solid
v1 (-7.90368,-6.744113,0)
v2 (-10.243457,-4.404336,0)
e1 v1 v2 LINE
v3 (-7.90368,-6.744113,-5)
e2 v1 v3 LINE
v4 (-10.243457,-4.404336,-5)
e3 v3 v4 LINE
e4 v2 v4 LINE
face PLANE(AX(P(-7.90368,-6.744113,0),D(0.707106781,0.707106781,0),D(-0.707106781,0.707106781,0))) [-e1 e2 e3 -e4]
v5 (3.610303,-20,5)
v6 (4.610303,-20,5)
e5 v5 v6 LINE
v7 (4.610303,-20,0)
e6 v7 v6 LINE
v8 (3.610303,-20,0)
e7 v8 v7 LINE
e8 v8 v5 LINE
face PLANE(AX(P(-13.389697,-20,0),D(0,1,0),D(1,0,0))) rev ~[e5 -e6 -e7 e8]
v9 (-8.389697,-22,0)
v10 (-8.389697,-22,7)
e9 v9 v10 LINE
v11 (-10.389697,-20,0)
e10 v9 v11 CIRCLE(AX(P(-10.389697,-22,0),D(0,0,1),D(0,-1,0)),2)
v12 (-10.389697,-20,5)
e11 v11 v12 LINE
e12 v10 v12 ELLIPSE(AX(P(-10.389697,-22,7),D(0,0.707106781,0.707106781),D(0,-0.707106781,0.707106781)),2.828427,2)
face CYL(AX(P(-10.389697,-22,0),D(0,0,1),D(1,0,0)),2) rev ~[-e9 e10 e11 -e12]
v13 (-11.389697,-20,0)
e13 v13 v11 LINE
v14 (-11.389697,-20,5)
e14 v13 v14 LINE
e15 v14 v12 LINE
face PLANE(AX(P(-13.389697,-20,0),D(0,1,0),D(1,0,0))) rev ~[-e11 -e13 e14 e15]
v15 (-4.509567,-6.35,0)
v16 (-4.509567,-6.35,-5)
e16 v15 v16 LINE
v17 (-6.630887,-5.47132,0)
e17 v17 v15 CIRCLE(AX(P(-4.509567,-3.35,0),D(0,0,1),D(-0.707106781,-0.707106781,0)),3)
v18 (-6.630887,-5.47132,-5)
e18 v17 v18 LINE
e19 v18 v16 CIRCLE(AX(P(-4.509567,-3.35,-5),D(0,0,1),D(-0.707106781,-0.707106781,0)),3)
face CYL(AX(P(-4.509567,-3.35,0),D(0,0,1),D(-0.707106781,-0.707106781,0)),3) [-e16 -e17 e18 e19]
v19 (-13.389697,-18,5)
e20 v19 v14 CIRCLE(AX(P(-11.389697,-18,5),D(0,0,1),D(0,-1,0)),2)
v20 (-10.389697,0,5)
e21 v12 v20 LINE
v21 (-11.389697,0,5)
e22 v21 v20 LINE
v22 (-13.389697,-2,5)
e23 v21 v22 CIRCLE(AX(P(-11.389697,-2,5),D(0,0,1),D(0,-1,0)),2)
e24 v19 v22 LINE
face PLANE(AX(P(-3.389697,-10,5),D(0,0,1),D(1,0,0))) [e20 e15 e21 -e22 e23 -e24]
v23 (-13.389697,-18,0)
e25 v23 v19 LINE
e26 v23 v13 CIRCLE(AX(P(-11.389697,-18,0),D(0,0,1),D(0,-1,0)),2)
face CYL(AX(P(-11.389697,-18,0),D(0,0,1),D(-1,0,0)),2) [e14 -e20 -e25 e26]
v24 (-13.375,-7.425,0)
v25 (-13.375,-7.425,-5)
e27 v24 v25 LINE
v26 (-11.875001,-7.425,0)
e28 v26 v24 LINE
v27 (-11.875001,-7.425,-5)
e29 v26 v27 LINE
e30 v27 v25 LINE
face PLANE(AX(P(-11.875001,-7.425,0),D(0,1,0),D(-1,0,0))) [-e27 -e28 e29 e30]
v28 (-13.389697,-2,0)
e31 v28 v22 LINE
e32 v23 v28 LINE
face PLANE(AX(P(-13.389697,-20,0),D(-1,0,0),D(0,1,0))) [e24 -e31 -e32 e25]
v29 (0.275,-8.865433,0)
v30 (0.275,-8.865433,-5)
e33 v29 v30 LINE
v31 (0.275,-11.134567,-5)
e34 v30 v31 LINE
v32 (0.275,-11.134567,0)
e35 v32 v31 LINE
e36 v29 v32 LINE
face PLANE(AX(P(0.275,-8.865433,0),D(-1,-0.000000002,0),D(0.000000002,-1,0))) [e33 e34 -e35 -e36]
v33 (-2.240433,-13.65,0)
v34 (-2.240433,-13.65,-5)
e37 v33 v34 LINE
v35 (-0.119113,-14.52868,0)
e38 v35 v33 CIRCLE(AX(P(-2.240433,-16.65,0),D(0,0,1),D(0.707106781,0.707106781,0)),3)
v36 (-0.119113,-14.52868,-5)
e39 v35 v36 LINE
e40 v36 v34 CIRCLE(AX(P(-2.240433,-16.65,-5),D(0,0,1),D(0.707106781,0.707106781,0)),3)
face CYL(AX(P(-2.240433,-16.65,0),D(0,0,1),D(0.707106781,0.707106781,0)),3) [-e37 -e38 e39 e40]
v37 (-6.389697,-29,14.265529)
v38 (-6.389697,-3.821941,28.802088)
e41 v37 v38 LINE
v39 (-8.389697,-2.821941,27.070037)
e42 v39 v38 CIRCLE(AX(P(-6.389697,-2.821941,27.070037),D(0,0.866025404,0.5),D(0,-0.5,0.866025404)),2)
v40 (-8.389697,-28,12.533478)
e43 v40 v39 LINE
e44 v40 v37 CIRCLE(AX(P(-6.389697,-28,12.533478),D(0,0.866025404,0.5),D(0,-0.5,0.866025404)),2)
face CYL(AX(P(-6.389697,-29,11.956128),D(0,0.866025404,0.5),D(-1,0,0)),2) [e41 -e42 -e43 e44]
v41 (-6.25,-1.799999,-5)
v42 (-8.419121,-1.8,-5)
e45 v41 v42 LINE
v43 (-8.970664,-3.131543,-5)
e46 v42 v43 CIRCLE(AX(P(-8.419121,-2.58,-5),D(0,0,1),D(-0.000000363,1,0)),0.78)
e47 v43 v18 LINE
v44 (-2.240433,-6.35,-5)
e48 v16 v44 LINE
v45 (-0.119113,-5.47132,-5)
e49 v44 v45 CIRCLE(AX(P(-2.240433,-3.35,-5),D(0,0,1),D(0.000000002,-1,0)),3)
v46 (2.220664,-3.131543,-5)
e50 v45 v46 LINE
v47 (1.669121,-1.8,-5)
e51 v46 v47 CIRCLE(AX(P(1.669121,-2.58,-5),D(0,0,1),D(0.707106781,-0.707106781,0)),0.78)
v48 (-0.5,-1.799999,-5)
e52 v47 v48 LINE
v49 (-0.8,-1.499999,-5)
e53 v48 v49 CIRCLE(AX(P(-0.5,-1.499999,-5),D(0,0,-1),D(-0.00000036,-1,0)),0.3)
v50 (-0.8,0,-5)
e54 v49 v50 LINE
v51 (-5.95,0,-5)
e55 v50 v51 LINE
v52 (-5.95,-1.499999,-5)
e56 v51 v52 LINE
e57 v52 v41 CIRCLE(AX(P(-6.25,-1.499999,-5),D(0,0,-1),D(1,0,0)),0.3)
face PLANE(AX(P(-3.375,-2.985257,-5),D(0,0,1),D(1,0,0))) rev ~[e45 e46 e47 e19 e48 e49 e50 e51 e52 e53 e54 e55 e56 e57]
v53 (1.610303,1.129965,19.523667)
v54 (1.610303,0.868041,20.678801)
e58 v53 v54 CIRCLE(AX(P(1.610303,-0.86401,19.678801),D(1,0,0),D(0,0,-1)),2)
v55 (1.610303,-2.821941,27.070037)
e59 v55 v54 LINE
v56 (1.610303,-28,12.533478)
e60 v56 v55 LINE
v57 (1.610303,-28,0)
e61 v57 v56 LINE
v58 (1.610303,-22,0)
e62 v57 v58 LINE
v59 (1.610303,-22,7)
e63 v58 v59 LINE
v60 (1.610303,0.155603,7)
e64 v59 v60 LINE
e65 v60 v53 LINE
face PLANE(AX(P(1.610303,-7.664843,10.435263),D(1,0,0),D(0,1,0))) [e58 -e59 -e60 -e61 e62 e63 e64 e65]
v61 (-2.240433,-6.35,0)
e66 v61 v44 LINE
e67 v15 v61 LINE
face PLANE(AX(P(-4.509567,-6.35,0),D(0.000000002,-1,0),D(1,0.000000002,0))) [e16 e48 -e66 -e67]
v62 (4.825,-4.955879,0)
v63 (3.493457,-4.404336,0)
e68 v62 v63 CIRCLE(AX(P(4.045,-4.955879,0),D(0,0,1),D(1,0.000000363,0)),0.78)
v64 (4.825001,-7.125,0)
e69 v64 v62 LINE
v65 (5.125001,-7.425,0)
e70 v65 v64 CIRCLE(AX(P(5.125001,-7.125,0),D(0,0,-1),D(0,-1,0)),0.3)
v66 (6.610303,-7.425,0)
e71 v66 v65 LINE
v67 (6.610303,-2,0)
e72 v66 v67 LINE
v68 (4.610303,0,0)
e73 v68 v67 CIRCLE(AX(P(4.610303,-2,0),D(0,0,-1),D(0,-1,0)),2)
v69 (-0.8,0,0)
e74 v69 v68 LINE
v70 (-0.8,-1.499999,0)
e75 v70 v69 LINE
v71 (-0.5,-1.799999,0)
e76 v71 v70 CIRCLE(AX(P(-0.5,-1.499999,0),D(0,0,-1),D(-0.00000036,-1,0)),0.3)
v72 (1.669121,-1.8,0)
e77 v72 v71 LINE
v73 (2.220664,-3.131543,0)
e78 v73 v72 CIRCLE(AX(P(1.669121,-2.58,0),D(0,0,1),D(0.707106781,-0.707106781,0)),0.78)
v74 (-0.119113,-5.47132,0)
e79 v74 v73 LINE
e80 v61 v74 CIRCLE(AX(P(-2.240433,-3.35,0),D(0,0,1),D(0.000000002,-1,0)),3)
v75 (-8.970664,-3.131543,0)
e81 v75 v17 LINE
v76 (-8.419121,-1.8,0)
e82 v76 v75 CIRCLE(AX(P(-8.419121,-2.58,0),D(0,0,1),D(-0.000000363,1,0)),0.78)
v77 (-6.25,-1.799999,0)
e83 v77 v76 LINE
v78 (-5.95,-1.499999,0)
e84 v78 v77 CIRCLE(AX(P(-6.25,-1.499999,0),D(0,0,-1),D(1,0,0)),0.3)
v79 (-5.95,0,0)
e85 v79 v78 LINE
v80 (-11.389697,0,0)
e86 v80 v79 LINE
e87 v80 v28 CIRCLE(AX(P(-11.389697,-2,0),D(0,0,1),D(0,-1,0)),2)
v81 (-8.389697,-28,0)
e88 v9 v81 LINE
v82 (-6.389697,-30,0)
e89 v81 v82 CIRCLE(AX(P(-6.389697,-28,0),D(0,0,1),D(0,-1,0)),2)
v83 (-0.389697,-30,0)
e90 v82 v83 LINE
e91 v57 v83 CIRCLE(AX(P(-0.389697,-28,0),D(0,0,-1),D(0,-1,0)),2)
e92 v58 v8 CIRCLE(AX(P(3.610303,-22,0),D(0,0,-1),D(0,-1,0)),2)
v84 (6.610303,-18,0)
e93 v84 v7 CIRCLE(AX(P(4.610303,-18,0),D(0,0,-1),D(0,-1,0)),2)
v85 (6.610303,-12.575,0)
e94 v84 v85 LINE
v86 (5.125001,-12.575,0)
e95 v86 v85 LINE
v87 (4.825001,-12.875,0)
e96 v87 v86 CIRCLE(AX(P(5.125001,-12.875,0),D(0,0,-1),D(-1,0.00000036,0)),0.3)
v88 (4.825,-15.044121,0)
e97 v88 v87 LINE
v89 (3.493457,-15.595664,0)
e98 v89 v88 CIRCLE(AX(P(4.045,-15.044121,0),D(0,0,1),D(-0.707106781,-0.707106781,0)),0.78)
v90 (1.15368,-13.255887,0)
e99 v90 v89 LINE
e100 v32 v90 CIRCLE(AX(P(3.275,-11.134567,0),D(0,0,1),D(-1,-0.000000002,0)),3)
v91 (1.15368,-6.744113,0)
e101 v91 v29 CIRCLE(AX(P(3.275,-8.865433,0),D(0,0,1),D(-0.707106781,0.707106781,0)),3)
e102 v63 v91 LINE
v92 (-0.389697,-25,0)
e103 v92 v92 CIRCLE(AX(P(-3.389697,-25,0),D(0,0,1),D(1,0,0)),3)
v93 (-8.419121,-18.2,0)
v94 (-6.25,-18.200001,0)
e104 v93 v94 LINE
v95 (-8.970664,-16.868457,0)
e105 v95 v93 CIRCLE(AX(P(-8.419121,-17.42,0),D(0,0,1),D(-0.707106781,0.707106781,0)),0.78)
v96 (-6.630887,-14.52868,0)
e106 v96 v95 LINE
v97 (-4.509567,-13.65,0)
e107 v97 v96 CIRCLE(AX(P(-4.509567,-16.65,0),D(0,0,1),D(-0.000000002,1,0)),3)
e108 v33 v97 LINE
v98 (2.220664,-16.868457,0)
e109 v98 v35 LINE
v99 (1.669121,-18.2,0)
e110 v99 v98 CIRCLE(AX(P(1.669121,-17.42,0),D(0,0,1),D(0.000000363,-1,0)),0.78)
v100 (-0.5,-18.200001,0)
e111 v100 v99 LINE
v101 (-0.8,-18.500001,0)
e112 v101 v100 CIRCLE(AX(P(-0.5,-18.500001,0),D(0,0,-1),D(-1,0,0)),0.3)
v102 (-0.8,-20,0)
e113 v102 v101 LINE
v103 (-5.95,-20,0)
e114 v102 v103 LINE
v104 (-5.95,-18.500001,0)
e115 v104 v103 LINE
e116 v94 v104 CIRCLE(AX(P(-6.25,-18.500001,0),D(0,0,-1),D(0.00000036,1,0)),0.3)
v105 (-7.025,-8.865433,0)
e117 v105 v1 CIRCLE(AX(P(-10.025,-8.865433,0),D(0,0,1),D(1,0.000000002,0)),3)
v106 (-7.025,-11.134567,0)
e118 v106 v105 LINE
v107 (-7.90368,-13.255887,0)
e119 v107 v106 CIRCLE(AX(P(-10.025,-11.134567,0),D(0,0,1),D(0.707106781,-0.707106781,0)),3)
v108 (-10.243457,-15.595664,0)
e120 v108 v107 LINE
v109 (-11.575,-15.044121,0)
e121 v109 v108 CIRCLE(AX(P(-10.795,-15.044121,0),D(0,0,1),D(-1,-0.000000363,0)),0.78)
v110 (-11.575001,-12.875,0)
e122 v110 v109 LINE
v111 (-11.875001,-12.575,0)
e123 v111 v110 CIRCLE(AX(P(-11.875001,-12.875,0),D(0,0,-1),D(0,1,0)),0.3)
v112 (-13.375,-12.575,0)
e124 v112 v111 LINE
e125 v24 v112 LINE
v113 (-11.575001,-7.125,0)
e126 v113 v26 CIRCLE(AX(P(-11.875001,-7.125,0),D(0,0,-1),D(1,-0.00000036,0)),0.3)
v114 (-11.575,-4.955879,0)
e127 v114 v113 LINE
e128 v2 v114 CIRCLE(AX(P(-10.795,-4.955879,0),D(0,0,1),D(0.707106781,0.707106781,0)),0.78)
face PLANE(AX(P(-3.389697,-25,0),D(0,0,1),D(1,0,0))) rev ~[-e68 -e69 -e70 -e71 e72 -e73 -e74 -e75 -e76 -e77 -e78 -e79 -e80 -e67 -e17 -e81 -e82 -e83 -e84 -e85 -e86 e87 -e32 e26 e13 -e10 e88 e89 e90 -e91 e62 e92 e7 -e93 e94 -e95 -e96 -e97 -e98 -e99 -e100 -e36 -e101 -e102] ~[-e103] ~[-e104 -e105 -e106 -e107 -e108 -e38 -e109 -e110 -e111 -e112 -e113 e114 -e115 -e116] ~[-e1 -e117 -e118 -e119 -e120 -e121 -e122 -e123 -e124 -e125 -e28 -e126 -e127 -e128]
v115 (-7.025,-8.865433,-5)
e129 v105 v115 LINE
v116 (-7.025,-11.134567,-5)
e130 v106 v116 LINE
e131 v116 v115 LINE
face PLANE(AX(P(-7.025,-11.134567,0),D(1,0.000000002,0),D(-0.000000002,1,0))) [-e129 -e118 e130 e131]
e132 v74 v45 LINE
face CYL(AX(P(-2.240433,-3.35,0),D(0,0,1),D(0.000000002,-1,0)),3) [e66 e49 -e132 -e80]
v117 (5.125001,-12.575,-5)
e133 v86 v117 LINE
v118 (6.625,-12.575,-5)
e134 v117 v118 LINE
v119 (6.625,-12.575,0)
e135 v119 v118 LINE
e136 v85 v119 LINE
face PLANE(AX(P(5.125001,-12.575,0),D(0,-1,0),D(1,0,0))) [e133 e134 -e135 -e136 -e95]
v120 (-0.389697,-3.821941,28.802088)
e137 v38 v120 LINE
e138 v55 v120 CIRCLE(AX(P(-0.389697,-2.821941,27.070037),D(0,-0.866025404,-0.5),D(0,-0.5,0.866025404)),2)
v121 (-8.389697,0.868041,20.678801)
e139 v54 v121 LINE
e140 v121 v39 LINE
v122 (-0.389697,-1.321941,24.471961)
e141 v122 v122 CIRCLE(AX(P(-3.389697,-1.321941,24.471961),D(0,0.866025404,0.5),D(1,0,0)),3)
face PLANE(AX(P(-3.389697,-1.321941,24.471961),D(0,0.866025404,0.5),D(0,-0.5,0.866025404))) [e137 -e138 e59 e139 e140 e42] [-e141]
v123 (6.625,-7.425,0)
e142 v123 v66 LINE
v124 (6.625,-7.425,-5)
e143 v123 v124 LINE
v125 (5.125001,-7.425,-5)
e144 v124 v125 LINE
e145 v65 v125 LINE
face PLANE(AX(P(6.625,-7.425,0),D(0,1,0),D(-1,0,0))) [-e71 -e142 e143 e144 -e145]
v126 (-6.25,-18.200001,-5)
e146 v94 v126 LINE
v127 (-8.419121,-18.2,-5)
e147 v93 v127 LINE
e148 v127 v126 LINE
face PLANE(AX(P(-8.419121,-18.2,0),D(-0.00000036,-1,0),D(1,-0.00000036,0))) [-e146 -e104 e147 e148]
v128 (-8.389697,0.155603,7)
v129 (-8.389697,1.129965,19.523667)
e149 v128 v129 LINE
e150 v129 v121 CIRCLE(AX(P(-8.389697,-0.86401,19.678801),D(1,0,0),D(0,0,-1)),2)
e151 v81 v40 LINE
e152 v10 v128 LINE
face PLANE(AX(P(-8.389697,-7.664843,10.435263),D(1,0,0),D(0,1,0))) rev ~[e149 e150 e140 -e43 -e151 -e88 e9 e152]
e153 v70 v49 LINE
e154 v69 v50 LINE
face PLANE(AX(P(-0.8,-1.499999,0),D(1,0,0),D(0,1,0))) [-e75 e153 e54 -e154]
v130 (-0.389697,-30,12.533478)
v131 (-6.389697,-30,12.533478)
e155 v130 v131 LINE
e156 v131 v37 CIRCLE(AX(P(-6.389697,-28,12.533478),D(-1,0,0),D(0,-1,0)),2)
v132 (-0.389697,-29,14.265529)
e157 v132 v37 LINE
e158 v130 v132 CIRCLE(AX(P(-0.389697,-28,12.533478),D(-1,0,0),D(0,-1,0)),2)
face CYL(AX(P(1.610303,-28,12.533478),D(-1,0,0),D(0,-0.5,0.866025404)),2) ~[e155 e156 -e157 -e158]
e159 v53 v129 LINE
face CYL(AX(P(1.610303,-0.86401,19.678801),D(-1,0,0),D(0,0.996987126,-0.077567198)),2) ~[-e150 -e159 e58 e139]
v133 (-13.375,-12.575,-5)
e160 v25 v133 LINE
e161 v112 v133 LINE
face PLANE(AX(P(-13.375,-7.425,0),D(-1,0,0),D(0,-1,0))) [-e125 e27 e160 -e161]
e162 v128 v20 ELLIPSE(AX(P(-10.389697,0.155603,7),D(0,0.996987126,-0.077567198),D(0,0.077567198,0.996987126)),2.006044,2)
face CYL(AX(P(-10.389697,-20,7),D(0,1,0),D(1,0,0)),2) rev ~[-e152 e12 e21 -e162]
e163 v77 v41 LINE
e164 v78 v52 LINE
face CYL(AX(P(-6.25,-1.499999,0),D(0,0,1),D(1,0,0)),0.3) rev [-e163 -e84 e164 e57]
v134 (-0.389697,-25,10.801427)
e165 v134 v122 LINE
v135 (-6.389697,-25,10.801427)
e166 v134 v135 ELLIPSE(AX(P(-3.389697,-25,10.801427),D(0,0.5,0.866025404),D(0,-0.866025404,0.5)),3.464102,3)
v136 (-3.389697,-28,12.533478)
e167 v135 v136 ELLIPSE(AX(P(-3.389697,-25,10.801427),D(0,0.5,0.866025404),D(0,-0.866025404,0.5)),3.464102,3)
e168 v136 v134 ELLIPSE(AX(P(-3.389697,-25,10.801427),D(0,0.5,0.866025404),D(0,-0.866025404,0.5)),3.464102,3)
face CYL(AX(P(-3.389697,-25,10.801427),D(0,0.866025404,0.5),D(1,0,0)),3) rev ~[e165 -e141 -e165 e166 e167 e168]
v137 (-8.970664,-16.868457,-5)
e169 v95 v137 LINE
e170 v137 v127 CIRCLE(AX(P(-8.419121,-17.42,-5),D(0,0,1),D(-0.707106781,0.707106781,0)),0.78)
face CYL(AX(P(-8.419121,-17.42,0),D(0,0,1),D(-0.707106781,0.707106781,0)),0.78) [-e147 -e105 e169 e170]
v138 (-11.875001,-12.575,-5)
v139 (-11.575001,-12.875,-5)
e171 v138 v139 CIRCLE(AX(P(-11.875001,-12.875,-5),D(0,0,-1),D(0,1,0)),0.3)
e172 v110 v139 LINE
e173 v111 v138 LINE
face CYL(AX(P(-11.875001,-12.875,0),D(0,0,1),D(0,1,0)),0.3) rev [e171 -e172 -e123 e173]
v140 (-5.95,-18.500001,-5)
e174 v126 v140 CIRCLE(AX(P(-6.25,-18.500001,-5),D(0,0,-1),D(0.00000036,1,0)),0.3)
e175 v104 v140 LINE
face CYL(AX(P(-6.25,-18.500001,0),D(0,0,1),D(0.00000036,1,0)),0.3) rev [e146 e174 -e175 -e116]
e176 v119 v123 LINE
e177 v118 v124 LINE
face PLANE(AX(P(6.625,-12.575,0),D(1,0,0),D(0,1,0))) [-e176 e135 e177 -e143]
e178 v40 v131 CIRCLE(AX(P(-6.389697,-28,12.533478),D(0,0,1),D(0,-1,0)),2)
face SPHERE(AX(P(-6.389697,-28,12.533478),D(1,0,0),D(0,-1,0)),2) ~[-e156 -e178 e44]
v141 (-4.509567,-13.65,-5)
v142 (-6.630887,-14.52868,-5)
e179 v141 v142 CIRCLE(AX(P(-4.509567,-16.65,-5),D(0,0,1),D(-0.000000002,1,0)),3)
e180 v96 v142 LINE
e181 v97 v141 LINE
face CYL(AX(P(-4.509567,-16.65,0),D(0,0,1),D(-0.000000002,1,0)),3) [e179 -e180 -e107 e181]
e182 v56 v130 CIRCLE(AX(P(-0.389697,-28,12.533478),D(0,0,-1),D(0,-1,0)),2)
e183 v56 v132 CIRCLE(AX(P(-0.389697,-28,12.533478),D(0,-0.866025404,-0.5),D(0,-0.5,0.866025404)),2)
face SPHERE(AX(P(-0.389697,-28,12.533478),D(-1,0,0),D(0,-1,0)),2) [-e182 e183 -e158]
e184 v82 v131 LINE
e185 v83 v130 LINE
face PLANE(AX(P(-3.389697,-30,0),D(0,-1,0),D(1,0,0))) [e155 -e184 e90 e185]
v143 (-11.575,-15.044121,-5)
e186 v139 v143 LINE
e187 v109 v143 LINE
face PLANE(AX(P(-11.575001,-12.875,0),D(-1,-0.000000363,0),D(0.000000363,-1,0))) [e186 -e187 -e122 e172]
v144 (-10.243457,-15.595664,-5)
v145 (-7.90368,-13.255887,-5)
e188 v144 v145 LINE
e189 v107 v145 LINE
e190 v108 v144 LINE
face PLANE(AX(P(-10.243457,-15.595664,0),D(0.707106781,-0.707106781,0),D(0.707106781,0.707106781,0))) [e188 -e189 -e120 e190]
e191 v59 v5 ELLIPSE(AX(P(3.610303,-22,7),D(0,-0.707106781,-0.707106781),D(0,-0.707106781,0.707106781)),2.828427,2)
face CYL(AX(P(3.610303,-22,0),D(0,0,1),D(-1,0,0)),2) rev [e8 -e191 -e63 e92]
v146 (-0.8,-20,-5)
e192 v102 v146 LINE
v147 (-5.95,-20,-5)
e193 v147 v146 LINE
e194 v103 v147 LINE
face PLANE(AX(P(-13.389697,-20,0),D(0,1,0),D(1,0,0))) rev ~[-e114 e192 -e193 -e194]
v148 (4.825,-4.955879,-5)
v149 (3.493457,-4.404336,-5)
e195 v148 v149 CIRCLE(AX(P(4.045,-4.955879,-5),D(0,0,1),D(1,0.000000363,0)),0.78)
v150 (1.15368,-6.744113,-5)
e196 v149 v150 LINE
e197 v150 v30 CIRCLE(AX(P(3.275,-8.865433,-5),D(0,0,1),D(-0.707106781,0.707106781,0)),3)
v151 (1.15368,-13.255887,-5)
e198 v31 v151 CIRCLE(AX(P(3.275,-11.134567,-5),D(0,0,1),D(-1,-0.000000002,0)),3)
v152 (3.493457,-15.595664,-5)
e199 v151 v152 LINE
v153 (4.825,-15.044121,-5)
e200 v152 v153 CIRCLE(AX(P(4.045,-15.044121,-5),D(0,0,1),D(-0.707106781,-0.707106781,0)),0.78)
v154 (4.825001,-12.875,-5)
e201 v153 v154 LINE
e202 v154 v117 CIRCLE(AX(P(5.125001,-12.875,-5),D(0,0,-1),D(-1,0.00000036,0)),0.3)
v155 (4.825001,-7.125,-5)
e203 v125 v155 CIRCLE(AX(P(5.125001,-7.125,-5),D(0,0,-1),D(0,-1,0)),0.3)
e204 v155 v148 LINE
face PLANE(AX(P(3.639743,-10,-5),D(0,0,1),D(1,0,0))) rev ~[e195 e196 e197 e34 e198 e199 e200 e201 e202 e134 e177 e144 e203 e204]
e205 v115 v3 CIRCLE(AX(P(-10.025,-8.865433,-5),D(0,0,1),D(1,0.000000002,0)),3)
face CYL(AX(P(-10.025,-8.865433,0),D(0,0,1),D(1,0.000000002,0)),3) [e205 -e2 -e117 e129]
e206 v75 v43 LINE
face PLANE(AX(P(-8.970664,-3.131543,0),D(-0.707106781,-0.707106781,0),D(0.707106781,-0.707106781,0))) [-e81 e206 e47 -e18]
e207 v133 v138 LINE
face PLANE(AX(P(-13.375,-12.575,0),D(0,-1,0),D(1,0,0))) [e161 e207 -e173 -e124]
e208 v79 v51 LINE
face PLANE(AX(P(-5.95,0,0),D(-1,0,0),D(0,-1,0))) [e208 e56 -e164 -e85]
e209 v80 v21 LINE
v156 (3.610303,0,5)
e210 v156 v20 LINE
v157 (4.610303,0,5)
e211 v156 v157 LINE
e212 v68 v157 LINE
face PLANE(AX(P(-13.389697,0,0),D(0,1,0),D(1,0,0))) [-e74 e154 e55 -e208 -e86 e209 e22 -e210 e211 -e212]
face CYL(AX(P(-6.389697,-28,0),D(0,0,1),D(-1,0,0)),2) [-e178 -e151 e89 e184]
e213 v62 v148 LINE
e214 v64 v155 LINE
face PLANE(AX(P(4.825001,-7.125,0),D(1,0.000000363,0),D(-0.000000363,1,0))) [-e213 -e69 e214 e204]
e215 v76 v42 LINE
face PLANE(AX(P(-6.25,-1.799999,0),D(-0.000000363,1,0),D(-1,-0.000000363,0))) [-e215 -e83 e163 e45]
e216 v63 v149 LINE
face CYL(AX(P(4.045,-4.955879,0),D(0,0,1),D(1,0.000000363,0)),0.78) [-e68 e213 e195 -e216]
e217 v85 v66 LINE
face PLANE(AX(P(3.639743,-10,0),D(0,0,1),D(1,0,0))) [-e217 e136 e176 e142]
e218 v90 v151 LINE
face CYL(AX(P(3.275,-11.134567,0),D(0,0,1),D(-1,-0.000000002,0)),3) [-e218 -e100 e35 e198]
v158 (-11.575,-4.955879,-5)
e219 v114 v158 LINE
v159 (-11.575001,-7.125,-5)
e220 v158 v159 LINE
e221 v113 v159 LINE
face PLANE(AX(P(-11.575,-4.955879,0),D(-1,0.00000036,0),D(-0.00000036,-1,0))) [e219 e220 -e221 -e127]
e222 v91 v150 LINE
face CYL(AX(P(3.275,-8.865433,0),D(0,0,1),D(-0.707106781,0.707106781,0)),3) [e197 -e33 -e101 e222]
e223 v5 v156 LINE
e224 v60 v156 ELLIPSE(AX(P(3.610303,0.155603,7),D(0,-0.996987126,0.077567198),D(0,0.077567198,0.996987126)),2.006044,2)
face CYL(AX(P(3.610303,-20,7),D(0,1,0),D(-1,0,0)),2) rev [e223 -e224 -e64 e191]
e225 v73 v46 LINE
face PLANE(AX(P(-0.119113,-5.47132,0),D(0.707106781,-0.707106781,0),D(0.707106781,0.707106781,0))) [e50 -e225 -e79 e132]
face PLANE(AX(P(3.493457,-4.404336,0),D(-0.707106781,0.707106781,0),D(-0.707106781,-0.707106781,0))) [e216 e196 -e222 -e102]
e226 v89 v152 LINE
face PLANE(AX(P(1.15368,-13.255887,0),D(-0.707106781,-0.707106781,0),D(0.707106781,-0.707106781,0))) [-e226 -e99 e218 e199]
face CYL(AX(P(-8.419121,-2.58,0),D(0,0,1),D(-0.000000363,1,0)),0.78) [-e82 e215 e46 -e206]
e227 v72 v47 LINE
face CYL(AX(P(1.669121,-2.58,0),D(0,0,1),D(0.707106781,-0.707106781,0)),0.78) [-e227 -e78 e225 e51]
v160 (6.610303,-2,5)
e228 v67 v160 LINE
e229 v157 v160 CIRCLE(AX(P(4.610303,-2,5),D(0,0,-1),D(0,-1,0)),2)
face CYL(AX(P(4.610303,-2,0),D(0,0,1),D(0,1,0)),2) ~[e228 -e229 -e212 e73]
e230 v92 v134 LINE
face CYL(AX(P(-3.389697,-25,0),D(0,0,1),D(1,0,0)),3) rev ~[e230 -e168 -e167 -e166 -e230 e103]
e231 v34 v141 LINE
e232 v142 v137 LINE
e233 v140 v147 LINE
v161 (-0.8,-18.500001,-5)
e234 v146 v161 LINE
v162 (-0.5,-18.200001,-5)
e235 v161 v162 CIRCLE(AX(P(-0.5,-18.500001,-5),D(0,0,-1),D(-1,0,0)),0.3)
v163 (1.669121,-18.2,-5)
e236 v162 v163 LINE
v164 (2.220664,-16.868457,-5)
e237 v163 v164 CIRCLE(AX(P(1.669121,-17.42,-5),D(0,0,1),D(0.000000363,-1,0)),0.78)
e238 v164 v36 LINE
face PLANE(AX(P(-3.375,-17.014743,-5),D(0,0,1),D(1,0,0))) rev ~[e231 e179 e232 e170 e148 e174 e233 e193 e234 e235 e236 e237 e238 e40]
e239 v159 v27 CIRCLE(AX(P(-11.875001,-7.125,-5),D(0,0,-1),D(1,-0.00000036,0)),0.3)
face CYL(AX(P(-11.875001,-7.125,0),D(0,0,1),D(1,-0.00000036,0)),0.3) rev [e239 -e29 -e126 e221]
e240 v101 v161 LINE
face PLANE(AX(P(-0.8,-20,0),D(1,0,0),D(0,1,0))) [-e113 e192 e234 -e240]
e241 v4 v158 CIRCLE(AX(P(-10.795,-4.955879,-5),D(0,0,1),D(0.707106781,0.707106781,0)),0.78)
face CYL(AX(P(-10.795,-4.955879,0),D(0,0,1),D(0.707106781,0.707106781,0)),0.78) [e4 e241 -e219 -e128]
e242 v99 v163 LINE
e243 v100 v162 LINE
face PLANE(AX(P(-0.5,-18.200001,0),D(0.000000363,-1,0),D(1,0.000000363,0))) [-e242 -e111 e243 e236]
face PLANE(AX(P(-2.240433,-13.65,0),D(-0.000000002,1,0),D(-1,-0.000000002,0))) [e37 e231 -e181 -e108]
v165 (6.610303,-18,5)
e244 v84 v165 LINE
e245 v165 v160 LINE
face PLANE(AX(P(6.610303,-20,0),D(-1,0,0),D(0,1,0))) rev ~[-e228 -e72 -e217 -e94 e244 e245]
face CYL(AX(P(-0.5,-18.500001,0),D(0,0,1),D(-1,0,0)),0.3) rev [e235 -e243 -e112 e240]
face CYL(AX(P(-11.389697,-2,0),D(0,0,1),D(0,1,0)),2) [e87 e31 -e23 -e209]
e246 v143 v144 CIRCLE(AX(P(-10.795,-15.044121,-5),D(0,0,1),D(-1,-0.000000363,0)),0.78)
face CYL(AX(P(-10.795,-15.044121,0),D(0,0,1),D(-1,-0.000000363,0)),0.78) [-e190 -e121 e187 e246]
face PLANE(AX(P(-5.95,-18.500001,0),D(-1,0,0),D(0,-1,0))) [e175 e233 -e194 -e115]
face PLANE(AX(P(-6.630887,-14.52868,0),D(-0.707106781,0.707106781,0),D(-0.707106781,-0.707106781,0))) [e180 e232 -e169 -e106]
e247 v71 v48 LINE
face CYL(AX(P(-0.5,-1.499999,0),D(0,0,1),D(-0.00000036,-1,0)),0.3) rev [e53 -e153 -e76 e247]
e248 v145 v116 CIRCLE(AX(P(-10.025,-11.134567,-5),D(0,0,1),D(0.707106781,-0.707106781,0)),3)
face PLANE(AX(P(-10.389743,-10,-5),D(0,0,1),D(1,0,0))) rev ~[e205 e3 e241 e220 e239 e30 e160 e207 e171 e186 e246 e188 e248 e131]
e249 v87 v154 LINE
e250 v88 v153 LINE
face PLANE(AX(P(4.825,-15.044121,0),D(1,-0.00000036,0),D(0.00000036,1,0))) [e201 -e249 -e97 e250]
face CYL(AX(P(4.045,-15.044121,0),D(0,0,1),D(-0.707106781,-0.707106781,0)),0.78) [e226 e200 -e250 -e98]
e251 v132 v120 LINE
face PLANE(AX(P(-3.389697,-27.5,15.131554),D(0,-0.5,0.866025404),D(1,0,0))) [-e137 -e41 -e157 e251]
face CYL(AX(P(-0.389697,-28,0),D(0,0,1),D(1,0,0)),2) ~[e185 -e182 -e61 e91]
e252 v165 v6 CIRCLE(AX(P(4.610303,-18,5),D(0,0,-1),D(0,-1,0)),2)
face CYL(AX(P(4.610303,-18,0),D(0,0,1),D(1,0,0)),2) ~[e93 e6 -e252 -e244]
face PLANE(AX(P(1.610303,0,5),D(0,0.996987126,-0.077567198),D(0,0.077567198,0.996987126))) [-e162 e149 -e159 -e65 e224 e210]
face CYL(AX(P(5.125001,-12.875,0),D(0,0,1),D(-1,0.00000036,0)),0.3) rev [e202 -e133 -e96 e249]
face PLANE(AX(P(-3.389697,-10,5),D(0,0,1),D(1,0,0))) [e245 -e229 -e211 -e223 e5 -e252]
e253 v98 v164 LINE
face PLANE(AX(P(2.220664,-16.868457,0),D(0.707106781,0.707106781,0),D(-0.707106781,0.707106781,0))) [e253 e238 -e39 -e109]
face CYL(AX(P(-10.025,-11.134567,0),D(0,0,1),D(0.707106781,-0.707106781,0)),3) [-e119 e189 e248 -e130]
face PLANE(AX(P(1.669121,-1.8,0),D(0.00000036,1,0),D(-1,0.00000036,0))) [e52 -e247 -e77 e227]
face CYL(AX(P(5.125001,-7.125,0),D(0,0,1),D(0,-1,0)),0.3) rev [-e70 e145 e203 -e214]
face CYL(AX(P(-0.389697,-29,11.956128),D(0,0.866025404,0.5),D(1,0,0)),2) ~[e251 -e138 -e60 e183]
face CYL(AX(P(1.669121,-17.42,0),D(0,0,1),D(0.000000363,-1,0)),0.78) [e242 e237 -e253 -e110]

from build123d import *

# Parameters (mm, degrees)
F1_DEPTH = 5
F2_W     = 20
F2_H     = 20
F3_DEPTH = 5
F6_W     = 10
F6_H     = 10
F6_R     = 3
F9_DEPTH = 10
F10_R    = 2


with BuildPart() as f1:
    # F0 (on Top) → F1 (new body)
    with BuildSketch(Plane.XY):
        with BuildLine():
            Line((-11.8750007629, -7.425), (-12.575, -7.425))
            Line((-12.575, -7.425), (-13.375, -7.425))
            Line((-13.375, -7.425), (-13.375, -12.575))
            Line((-13.375, -12.575), (-12.575, -12.575))
            Line((-12.575, -12.575), (-11.8750007629, -12.575))
            ThreePointArc((-11.8750007629, -12.575), (-11.6628687671, -12.6628679271), (-11.5750007629, -12.8749998911))
            Line((-11.5750007629, -12.8749998911), (-11.5749999754, -15.0441214738))
            ThreePointArc((-11.5749999754, -15.0441214738), (-11.0934929218, -15.7647472802), (-10.2434566861, -15.5956644799))
            Line((-10.2434566861, -15.5956644799), (-7.9036796566, -13.2558874505))
            ThreePointArc((-7.9036796566, -13.2558874505), (-7.2533614014, -12.2826174011), (-7.0250000001, -11.1345671007))
            Line((-7.0250000001, -11.1345671007), (-7.0250000049, -8.8654328821))
            ThreePointArc((-7.0250000049, -8.8654328821), (-7.2533614085, -7.7173825884), (-7.9036796613, -6.7441125448))
            Line((-7.9036796613, -6.7441125448), (-10.2434566921, -4.404335514))
            ThreePointArc((-10.2434566921, -4.404335514), (-11.0934929289, -4.2352527142), (-11.5749999814, -4.9558785223))
            Line((-11.5749999814, -4.9558785223), (-11.5750007629, -7.1250001081))
            ThreePointArc((-11.5750007629, -7.1250001081), (-11.6628687668, -7.3371320726), (-11.8750007629, -7.425))
        make_face()
    extrude(amount=-F1_DEPTH)



with BuildPart() as f1b:
    # F0 (on Top) → F1, piece 2 (new body)
    with BuildSketch(Plane.XY):
        with BuildLine():
            Line((-0.8, -20), (-0.8, -19.2))
            Line((-0.8, -19.2), (-0.8, -18.5000007629))
            ThreePointArc((-0.8, -18.5000007629), (-0.7121320729, -18.2878687671), (-0.5000001089, -18.2000007629))
            Line((-0.5000001089, -18.2000007629), (1.6691214738, -18.1999999754))
            ThreePointArc((1.6691214738, -18.1999999754), (2.3897472802, -17.7184929218), (2.2206644799, -16.868456686))
            Line((2.2206644799, -16.868456686), (-0.1191125495, -14.5286796566))
            ThreePointArc((-0.1191125495, -14.5286796566), (-1.0923825989, -13.8783614014), (-2.2404328993, -13.6500000001))
            Line((-2.2404328993, -13.6500000001), (-4.5095671179, -13.6500000049))
            ThreePointArc((-4.5095671179, -13.6500000049), (-5.6576174116, -13.8783614085), (-6.6308874552, -14.5286796613))
            Line((-6.6308874552, -14.5286796613), (-8.970664486, -16.8684566921))
            ThreePointArc((-8.970664486, -16.8684566921), (-9.1397472858, -17.7184929288), (-8.4191214777, -18.1999999814))
            Line((-8.4191214777, -18.1999999814), (-6.2499998919, -18.2000007629))
            ThreePointArc((-6.2499998919, -18.2000007629), (-6.0378679274, -18.2878687668), (-5.95, -18.5000007629))
            Line((-5.95, -18.5000007629), (-5.95, -19.2))
            Line((-5.95, -19.2), (-5.95, -20))
            Line((-5.95, -20), (-0.8, -20))
        make_face()
    extrude(amount=-F1_DEPTH)


with BuildPart() as f1c:
    # F0 (on Top) → F1, piece 3 (new body)
    with BuildSketch(Plane.XY):
        with BuildLine():
            Line((3.4934566861, -4.4043355201), (1.1536796566, -6.7441125495))
            ThreePointArc((1.1536796566, -6.7441125495), (0.5033614014, -7.7173825989), (0.2750000001, -8.8654328993))
            Line((0.2750000001, -8.8654328993), (0.2750000049, -11.1345671179))
            ThreePointArc((0.2750000049, -11.1345671179), (0.5033614085, -12.2826174116), (1.1536796613, -13.2558874552))
            Line((1.1536796613, -13.2558874552), (3.4934566921, -15.595664486))
            ThreePointArc((3.4934566921, -15.595664486), (4.3434929289, -15.7647472858), (4.8249999814, -15.0441214777))
            Line((4.8249999814, -15.0441214777), (4.8250007629, -12.8749998919))
            ThreePointArc((4.8250007629, -12.8749998919), (4.9128687668, -12.6628679274), (5.1250007629, -12.575))
            Line((5.1250007629, -12.575), (5.825, -12.575))
            Line((5.825, -12.575), (6.625, -12.575))
            Line((6.625, -12.575), (6.625, -7.425))
            Line((6.625, -7.425), (5.825, -7.425))
            Line((5.825, -7.425), (5.1250007629, -7.425))
            ThreePointArc((5.1250007629, -7.425), (4.9128687671, -7.3371320729), (4.8250007629, -7.1250001089))
            Line((4.8250007629, -7.1250001089), (4.8249999754, -4.9558785262))
            ThreePointArc((4.8249999754, -4.9558785262), (4.3434929218, -4.2352527198), (3.4934566861, -4.4043355201))
        make_face()
    extrude(amount=-F1_DEPTH)


with BuildPart() as f1d:
    # F0 (on Top) → F1, piece 4 (new body)
    with BuildSketch(Plane.XY):
        with BuildLine():
            Line((-0.8, -1.4999992371), (-0.8, -0.8))
            Line((-0.8, -0.8), (-0.8, 0))
            Line((-0.8, 0), (-5.95, 0))
            Line((-5.95, 0), (-5.95, -0.8))
            Line((-5.95, -0.8), (-5.95, -1.4999992371))
            ThreePointArc((-5.95, -1.4999992371), (-6.0378679271, -1.7121312329), (-6.2499998911, -1.7999992371))
            Line((-6.2499998911, -1.7999992371), (-8.4191214738, -1.8000000246))
            ThreePointArc((-8.4191214738, -1.8000000246), (-9.1397472801, -2.2815070782), (-8.9706644799, -3.1315433139))
            Line((-8.9706644799, -3.1315433139), (-6.6308874505, -5.4713203434))
            ThreePointArc((-6.6308874505, -5.4713203434), (-5.6576174011, -6.1216385986), (-4.5095671007, -6.3499999999))
            Line((-4.5095671007, -6.3499999999), (-2.2404328821, -6.3499999951))
            ThreePointArc((-2.2404328821, -6.3499999951), (-1.0923825884, -6.1216385915), (-0.1191125448, -5.4713203387))
            Line((-0.1191125448, -5.4713203387), (2.220664486, -3.1315433079))
            ThreePointArc((2.220664486, -3.1315433079), (2.3897472858, -2.2815070711), (1.6691214777, -1.8000000186))
            Line((1.6691214777, -1.8000000186), (-0.5000001081, -1.7999992371))
            ThreePointArc((-0.5000001081, -1.7999992371), (-0.7121320726, -1.7121312332), (-0.8, -1.4999992371))
        make_face()
    extrude(amount=-F1_DEPTH)


with BuildPart() as f1_1:
    add(f1.part)

    add(f1b.part)  # F3 merges F1b

    add(f1c.part)  # F3 merges F1c

    add(f1d.part)  # F3 merges F1d
    # F2 (on face) → F3 (join)
    with BuildSketch(Plane.XY):
        with Locations((-3.3896967843, -10)):
            Rectangle(F2_W, F2_H)
    extrude(amount=F3_DEPTH)

    # F7: sweep along a path in F5
    with BuildLine(Plane.YZ.offset(-3.3896967843)) as f7_path:
        Line((-25, 0), (-25, 10.8014274722))
        Line((-25, 10.8014274722), (-1.3219409988, 24.4719612104))
    # F6 (on Top) → F7 (sweep)
    with BuildSketch(Plane.XY):
        with Locations((-3.3896967843, -25)):
            Rectangle(F6_W, F6_H)
        with Locations((-3.3896967843, -25)):
            Circle(F6_R, mode=Mode.SUBTRACT)
    sweep(path=f7_path.line, transition=Transition.RIGHT)

    # F8 (on face) → F9 (join)
    with BuildSketch(Plane.YZ.offset(1.6103032157)):
        Polygon((0, 5), (1.1780590012, 20.1418341915), (-20, 7.9146761262), (-20, 5), align=None)
    extrude(amount=-F9_DEPTH)

    # F10
    f10_edges = [f1_1.edges().sort_by_distance(p)[0] for p in [
        (6.610303, 0, 2.5),
        (6.610303, -20, 2.5),
        (-13.389697, 0, 2.5),
        (-13.389697, -20, 2.5),
        (-8.389697, -30, 6.844089),
        (1.610303, -30, 6.844089),
        (-8.389697, -16.91097, 21.245134),
        (1.610303, -16.91097, 21.245134),
        (-3.389697, -30, 13.688179),
        (-8.389697, -20, 2.5),
        (1.610303, -20, 2.5),
        (1.610303, -10, 5),
        (-8.389697, -10, 5),
        (-3.389697, 1.178059, 20.141834),
    ]]
    fillet(f10_edges, radius=F10_R)


solid = f1_1.part
